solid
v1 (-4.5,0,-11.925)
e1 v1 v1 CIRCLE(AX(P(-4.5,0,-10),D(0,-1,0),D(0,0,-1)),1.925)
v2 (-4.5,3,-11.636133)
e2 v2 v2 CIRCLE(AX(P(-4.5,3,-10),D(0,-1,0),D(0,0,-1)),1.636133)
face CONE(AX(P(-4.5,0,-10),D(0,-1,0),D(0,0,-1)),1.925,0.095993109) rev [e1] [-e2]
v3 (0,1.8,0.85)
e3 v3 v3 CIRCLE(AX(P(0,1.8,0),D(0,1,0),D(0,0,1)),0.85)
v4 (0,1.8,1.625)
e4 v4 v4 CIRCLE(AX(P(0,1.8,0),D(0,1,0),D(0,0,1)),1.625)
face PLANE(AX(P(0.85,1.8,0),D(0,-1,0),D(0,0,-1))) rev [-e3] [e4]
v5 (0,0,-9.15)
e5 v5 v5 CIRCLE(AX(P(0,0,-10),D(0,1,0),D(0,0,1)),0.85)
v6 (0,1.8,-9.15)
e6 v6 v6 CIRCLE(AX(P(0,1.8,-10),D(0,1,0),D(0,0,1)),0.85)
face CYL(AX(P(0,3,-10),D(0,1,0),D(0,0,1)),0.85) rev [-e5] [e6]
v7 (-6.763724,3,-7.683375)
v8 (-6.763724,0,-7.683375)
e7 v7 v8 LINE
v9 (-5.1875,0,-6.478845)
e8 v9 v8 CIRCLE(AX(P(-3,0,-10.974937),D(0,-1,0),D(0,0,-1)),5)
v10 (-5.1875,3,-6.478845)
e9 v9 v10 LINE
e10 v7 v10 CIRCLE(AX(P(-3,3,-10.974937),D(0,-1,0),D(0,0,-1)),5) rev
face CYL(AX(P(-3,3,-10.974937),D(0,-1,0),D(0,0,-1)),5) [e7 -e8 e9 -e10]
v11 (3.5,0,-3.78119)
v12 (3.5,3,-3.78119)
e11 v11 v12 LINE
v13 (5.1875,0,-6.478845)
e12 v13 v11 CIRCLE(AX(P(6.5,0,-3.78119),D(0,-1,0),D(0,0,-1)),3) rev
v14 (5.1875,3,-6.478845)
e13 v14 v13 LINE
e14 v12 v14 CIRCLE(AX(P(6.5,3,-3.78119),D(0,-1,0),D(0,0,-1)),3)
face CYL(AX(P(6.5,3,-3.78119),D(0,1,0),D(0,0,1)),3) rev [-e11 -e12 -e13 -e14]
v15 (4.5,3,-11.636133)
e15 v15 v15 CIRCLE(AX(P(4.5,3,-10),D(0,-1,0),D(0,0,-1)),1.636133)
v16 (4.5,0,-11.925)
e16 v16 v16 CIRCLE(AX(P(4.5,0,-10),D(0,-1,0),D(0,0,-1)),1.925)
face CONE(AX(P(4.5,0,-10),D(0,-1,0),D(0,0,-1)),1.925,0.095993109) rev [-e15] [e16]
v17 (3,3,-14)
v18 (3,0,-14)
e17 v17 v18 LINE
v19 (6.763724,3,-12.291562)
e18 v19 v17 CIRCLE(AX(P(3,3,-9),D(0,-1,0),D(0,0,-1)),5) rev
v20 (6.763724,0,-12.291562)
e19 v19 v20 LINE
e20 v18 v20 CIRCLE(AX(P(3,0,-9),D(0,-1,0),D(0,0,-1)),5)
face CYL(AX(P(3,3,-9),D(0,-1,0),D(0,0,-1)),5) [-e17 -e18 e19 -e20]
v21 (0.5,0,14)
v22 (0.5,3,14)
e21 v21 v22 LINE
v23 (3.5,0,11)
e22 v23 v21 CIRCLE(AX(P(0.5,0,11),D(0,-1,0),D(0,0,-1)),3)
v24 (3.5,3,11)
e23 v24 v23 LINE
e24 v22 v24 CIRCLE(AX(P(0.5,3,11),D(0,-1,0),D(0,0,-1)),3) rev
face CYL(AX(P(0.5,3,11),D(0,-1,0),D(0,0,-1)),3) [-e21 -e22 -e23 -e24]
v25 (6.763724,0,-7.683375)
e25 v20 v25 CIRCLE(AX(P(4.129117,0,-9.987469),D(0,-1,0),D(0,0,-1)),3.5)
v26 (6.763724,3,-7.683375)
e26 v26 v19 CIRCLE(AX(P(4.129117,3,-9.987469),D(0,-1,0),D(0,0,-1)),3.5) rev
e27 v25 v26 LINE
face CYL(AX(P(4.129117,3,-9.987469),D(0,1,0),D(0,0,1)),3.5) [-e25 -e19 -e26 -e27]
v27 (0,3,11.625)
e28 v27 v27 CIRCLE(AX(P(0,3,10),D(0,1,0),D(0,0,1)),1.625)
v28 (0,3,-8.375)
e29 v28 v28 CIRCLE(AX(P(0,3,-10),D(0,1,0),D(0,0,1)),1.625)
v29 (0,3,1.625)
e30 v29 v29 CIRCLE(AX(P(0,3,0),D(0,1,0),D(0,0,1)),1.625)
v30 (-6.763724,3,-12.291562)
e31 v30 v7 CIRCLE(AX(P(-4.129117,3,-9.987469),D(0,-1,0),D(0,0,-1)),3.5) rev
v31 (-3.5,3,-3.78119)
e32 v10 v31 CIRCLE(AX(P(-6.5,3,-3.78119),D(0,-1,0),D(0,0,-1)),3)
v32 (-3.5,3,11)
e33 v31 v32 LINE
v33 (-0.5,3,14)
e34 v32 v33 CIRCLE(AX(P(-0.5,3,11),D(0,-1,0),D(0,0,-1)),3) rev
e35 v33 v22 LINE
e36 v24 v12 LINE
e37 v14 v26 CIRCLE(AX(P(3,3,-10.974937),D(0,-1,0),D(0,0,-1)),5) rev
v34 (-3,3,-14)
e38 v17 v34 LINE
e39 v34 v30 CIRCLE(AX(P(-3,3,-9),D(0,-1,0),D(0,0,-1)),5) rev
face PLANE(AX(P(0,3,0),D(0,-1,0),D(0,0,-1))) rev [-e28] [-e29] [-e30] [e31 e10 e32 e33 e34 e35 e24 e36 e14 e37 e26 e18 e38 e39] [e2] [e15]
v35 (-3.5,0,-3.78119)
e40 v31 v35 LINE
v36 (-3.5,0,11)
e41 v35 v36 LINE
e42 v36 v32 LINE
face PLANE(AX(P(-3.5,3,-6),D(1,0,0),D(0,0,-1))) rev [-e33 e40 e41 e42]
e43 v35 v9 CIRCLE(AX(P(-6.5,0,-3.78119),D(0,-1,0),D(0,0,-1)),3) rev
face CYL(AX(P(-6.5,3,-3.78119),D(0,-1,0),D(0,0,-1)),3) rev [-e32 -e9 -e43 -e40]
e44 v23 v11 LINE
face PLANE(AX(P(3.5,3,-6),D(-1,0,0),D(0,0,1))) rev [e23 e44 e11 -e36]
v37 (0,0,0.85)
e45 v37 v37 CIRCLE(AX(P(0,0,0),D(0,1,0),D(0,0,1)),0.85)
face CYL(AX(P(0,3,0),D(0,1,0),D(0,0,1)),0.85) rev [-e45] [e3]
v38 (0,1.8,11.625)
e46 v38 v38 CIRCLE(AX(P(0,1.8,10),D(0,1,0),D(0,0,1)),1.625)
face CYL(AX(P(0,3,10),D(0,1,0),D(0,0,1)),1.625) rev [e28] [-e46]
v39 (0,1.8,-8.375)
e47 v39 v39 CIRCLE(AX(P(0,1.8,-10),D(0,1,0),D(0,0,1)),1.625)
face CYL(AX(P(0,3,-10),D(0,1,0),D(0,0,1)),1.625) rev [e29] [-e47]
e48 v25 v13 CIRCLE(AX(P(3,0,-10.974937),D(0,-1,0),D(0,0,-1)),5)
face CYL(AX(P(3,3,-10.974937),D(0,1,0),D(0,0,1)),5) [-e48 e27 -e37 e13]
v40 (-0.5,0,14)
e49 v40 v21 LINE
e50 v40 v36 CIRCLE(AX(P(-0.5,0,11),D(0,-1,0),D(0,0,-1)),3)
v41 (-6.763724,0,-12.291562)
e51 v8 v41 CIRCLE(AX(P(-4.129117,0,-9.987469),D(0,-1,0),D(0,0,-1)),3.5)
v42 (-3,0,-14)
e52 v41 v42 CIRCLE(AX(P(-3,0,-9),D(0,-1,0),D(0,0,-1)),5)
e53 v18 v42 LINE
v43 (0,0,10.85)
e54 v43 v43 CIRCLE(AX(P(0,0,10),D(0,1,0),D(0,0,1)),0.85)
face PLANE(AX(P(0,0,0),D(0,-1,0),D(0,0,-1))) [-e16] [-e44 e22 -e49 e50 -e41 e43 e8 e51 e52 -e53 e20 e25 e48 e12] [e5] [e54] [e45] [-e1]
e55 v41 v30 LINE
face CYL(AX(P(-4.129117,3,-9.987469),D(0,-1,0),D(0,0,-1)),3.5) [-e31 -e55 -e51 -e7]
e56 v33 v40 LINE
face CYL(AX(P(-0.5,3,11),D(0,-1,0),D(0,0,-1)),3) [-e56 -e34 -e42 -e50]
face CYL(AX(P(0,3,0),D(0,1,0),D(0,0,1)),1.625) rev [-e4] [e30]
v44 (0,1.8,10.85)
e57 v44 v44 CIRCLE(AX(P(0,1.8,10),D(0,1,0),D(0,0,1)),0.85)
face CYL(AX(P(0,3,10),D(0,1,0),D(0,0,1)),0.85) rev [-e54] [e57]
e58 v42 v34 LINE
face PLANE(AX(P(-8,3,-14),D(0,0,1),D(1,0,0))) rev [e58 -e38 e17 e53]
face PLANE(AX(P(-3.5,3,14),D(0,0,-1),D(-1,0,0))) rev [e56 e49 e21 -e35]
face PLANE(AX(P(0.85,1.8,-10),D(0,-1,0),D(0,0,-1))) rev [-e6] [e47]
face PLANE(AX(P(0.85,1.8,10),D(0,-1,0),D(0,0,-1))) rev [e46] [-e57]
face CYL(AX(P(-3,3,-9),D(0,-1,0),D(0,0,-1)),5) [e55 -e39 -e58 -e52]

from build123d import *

# Parameters (mm, degrees)
BOSS_EXTRUDE1_DEPTH                          = 3
CBORE_FOR_M5_HEX_HEAD_BOLT1_D                = 1.7
CBORE_FOR_M5_HEX_HEAD_BOLT1_CBORE_D          = 3.25
CBORE_FOR_M5_HEX_HEAD_BOLT1_CBORE_DEPTH      = 1.2
FILLET1_R                                    = 5
FILLET2_R                                    = 3.5
FILLET3_R                                    = 3
CSK_FOR_M2_COUNTERSUNK_FLAT_HEAD_SCR_2_COUNT = 2
CSK_FOR_M2_COUNTERSUNK_FLAT_HEAD_SCR_2_PITCH = 9


with BuildPart() as part:
    # Sketch1 → Boss-Extrude1 (new body)
    with BuildSketch(Plane(origin=(0, 0, 0), x_dir=(1, 0, 0), z_dir=(0, 1, 0))):
        Polygon((3.5, 6), (8, 6), (8, 14), (-8, 14), (-8, 6), (-3.5, 6), (-3.5, -14), (3.5, -14), align=None)
    extrude(amount=BOSS_EXTRUDE1_DEPTH)

    # CBORE for M5 Hex Head Bolt1 (through all)
    with Locations(Plane(origin=(0, 3, 0), x_dir=(1, 0, 0), z_dir=(0, 1, 0))):
        with Locations((0, 10), (0, 0), (0, -10)):
            CounterBoreHole(CBORE_FOR_M5_HEX_HEAD_BOLT1_D / 2, CBORE_FOR_M5_HEX_HEAD_BOLT1_CBORE_D / 2, CBORE_FOR_M5_HEX_HEAD_BOLT1_CBORE_DEPTH)

    # Fillet1
    # the kernel refuses this fillet: 5 mm, written as the material it takes off along each edge
    with BuildSketch(Plane(origin=(-8, -12.437342964, -6), x_dir=(0, 0, -1), z_dir=(0, 1, 0))) as fillet1_piece_1:
        with BuildLine():
            CenterArc((4.974937186, -5), FILLET1_R, 90, 84.260829523)
            Line((0, -4.5), (-0.099498744, -4.49))
            ThreePointArc((-0.099498744, -4.49), (-0.1, -2.25), (-0.1, 0))
            Line((-0.1, 0), (0, 0.1))
            Line((0, 0.1), (4.974937186, 0.1))
            Line((4.974937186, 0.1), (4.974937186, 0))
        make_face()
    extrude(amount=27.874685928, mode=Mode.SUBTRACT)
    with BuildSketch(Plane(origin=(-8, -12.5, -14), x_dir=(1, 0, 0), z_dir=(0, 1, 0)), Plane(origin=(8, -12.5, -14), x_dir=(0, 0, 1), z_dir=(0, 1, 0))) as fillet1_piece_2:
        with BuildLine():
            CenterArc((FILLET1_R, -FILLET1_R), FILLET1_R, 90, 90)
            Line((0, -FILLET1_R), (-FILLET1_R * 0.02, -FILLET1_R))
            Line((-FILLET1_R * 0.02, -FILLET1_R), (-FILLET1_R * 0.02, FILLET1_R * 0.02))
            Line((-FILLET1_R * 0.02, FILLET1_R * 0.02), (FILLET1_R, FILLET1_R * 0.02))
            Line((FILLET1_R, FILLET1_R * 0.02), (FILLET1_R, 0))
        make_face()
    extrude(amount=28, mode=Mode.SUBTRACT)
    with BuildSketch(Plane(origin=(8, -12.437342964, -6), x_dir=(-1, 0, 0), z_dir=(0, 1, 0))) as fillet1_piece_3:
        with BuildLine():
            CenterArc((5, -4.974937186), FILLET1_R, 95.739170477, 84.260829523)
            Line((0, -4.974937186), (-0.1, -4.974937186))
            Line((-0.1, -4.974937186), (-0.1, 0))
            Line((-0.1, 0), (0, 0.1))
            ThreePointArc((0, 0.1), (2.25, 0.1), (4.49, 0.099498744))
            Line((4.49, 0.099498744), (4.5, 0))
        make_face()
    extrude(amount=27.874685928, mode=Mode.SUBTRACT)

    # Fillet2
    fillet2_edges = [part.edges().sort_by_distance(p)[0] for p in [
        (-7.901520762, 1.5, -9.987468593),
        (7.901520762, 1.5, -9.987468593),
    ]]
    fillet(fillet2_edges, radius=FILLET2_R)

    # Fillet3
    fillet3_edges = [part.edges().sort_by_distance(p)[0] for p in [
        (3.5, 1.5, -6),
        (3.5, 1.5, 14),
        (-3.5, 1.5, 14),
        (-3.5, 1.5, -6),
    ]]
    fillet(fillet3_edges, radius=FILLET3_R)

    # Sketch8 → CSK for M2 Countersunk Flat Head Screw2 (revolve, cut)
    with BuildSketch(Plane(origin=(-4.5, 0, -10), x_dir=(0, 0, -1), z_dir=(1, 0, 0))):
        Polygon((0, 0), (0, 3), (1.6, 3), (1.6, 3.375254051), (1.925, 0), align=None)
    csk_for_m2_countersunk_flat_head_screw2 = revolve(axis=Axis((-4.5, -6.35, -10), (0, 1, 0)), mode=Mode.SUBTRACT)

    # CSK for M2 Countersunk Flat Head Scr 2: CSK for M2 Countersunk Flat Head Screw2 ×2
    with Locations(*[(i * CSK_FOR_M2_COUNTERSUNK_FLAT_HEAD_SCR_2_PITCH, 0, 0) for i in range(1, CSK_FOR_M2_COUNTERSUNK_FLAT_HEAD_SCR_2_COUNT)]):
        add(csk_for_m2_countersunk_flat_head_screw2, mode=Mode.SUBTRACT)


solid = part.part
